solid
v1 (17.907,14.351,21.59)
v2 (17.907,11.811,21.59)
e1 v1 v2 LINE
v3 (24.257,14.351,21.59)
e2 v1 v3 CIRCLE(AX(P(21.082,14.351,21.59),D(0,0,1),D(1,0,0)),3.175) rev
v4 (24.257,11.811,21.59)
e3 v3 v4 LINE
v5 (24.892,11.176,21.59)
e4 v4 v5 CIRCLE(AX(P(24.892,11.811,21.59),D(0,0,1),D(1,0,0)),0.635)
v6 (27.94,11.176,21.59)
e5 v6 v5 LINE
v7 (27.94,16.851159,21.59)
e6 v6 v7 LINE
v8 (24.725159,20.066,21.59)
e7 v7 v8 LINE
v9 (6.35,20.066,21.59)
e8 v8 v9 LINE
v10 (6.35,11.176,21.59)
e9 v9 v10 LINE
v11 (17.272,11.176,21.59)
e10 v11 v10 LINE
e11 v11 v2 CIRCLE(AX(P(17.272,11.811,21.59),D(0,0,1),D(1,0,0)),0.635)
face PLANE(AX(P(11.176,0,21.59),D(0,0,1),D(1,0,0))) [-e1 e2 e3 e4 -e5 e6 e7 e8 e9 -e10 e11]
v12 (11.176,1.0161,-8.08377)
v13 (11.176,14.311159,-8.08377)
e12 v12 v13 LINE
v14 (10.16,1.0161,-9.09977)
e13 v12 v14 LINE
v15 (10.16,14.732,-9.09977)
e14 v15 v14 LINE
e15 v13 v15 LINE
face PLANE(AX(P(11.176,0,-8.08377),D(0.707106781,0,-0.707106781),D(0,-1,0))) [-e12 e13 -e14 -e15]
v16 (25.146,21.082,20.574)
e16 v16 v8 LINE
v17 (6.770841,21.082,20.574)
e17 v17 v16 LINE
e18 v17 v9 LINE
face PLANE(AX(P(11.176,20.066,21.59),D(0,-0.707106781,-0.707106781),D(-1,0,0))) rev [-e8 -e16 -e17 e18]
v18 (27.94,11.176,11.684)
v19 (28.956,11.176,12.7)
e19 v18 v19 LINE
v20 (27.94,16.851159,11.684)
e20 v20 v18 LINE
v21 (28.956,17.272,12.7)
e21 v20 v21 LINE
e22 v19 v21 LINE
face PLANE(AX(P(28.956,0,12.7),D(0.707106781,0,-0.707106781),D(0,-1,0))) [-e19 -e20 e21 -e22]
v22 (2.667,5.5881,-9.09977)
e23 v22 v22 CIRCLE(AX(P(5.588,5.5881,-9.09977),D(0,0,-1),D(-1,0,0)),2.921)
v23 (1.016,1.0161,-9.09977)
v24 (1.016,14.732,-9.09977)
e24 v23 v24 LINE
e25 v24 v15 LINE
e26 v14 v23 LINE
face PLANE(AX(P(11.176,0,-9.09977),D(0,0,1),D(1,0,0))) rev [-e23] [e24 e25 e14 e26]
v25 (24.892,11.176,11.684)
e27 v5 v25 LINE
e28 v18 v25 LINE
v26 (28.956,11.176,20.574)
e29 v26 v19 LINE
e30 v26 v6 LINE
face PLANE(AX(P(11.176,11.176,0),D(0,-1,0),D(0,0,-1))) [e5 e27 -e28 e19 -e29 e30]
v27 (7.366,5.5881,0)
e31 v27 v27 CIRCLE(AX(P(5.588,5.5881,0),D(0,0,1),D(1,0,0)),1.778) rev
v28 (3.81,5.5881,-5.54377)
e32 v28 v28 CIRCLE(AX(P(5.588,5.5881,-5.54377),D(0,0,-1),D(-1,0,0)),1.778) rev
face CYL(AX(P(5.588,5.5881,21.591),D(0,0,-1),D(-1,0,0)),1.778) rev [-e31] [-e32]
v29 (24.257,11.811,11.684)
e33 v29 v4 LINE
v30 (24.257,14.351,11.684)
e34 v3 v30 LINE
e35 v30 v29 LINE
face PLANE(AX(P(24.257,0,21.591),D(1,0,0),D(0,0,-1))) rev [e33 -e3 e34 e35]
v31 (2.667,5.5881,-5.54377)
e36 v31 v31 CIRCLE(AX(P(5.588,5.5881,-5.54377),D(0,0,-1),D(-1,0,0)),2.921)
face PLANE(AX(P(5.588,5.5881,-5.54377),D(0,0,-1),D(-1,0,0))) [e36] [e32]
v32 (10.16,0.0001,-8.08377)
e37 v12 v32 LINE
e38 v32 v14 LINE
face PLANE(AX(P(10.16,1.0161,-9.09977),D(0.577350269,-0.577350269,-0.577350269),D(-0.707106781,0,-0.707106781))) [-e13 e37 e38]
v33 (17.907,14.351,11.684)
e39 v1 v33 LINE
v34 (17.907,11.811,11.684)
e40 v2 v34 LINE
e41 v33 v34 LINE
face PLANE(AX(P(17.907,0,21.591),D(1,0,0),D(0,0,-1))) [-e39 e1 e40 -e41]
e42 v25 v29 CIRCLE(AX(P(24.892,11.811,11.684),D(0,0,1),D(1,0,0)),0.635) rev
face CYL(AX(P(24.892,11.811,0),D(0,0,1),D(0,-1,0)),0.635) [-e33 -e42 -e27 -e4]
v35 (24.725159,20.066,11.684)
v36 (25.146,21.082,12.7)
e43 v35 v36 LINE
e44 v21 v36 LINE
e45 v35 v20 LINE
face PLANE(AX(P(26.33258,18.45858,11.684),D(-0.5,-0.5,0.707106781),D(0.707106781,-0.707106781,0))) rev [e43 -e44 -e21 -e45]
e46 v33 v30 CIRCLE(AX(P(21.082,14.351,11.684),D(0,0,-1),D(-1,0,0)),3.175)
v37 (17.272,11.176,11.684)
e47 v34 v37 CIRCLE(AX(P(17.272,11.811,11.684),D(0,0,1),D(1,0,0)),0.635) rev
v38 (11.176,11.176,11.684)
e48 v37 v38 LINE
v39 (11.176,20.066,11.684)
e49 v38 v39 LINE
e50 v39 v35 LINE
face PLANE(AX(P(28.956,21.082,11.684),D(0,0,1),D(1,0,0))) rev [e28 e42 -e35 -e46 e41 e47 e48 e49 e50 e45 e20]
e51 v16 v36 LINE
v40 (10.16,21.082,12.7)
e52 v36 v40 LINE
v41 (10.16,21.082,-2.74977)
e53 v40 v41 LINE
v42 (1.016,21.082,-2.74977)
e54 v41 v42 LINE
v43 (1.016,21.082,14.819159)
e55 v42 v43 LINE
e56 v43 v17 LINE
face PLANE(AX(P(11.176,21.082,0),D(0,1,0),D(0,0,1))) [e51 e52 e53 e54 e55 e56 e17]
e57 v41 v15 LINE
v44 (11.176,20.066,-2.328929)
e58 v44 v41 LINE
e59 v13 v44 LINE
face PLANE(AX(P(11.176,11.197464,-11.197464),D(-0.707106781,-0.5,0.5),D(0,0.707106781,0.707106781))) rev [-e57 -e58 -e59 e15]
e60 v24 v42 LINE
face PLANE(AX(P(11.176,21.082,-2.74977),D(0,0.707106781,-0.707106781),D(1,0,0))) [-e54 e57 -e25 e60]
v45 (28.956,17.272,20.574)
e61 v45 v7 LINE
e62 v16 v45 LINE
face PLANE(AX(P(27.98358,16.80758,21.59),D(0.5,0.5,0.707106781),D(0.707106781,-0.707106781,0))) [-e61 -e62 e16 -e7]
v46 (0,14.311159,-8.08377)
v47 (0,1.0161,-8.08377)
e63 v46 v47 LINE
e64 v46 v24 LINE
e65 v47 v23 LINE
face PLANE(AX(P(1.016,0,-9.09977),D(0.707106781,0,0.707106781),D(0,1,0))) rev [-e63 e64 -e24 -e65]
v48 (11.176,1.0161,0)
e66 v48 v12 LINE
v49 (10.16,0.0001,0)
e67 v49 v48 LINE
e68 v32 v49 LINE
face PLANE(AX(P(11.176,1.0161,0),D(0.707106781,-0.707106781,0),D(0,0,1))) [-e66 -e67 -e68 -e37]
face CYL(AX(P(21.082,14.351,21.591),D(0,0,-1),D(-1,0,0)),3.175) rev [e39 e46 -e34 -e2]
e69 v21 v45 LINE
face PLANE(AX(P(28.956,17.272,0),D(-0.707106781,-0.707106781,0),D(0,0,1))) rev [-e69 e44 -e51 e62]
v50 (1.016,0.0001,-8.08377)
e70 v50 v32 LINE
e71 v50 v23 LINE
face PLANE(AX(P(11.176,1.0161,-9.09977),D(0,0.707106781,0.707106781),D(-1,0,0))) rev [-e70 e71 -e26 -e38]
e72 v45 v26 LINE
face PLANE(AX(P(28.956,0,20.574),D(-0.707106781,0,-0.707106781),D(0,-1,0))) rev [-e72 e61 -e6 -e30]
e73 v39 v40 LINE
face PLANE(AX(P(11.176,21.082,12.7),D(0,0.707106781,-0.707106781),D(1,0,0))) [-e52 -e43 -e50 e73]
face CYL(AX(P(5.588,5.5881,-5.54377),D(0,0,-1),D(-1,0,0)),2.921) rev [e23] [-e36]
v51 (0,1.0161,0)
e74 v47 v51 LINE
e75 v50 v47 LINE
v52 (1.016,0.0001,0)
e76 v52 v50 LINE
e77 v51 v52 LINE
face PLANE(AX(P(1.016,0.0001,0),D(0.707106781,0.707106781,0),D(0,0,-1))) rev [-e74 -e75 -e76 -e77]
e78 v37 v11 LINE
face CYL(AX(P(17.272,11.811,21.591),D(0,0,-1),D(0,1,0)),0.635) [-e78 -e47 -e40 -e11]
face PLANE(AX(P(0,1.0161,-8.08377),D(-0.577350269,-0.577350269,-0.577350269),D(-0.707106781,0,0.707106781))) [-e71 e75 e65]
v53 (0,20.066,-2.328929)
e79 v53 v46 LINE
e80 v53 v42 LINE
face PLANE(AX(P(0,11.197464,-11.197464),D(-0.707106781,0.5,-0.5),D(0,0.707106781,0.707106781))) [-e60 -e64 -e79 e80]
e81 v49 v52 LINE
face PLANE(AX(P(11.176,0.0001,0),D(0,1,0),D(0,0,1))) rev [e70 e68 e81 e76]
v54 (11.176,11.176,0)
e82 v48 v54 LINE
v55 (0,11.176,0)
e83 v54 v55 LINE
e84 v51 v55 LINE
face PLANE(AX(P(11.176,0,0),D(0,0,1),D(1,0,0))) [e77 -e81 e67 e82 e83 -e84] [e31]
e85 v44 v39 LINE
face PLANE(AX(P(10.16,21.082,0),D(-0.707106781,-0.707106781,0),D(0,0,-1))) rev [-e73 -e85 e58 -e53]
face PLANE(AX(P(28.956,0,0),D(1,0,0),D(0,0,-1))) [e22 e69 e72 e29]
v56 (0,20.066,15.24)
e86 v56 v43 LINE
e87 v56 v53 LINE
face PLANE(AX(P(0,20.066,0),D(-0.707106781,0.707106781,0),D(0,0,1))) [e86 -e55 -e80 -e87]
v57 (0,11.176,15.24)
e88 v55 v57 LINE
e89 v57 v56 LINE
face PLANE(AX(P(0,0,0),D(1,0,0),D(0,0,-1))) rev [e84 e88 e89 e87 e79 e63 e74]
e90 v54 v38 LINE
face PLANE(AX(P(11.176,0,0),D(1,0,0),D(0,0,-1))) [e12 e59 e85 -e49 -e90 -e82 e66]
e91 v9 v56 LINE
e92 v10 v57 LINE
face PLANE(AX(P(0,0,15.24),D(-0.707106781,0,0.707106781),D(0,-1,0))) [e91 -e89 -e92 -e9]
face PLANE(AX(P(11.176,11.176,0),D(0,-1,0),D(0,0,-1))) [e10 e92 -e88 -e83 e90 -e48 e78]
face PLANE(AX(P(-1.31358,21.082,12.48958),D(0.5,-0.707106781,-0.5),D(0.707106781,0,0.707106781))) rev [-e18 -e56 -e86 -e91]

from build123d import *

# Parameters (mm, degrees)
BOSS_EXTRUDE1_DEPTH = 11.176
SKETCH2_W           = 9.906
SKETCH2_H           = 9.906
BOSS_EXTRUDE2_DEPTH = 17.78
CUT_EXTRUDE1_REACH  = 43.411
SKETCH3_R           = 3.175
CUT_EXTRUDE2_REACH  = 49.167
SKETCH4_R           = 1.778
SKETCH5_R           = 2.921
CUT_EXTRUDE3_DEPTH  = 3.556
FILLET8_R           = 0.635
CHAMFER1_SIZE       = 6.35
CHAMFER2_SIZE       = 6.35
CHAMFER3_SIZE       = 3.81
CHAMFER4_SIZE       = 1.016
CHAMFER5_SIZE       = 1.016


# Read off the part's stored shape, not the designer's step: Boss-Extrude1
with BuildPart() as part:
    # Boss-Extrude1 outline → Boss-Extrude1 (new body)
    with BuildSketch(Plane(origin=(0, 0, 0), x_dir=(0, 0, -1), z_dir=(1, 0, 0))):
        Polygon((9.099769579, 0.0001), (9.099769579, 21.082), (-21.59, 21.082), (-21.59, 11.176), (0, 11.176), (0, 0.0001), align=None)
    extrude(amount=BOSS_EXTRUDE1_DEPTH)

    # Sketch2 → Boss-Extrude2 (add)
    with BuildSketch(Plane(origin=(11.176, 0, 0), x_dir=(0, 0, -1), z_dir=(1, 0, 0))):
        with Locations((-16.637, 16.129)):
            Rectangle(SKETCH2_W, SKETCH2_H)
    extrude(amount=BOSS_EXTRUDE2_DEPTH)

    # Sketch3 → Cut-Extrude1 (cut, up to next)
    with BuildSketch(Plane(origin=(0, 0, 11.684), x_dir=(-1, 0, 0), z_dir=(0, 0, -1)), mode=Mode.PRIVATE) as cut_extrude1_sk1:
        with Locations((-21.082, 14.351)):
            Circle(SKETCH3_R)
    cut_extrude1_tool1 = extrude(cut_extrude1_sk1.sketch, amount=-CUT_EXTRUDE1_REACH, mode=Mode.PRIVATE) & part.part
    # Sketch3 → Cut-Extrude1 (cut, up to next)
    with BuildSketch(Plane(origin=(0, 0, 11.684), x_dir=(-1, 0, 0), z_dir=(0, 0, -1)), mode=Mode.PRIVATE) as cut_extrude1_sk2:
        with BuildLine():
            ThreePointArc((-21.082, 11.176), (-23.32706403, 12.10593597), (-24.257, 14.351))
            Line((-24.257, 14.351), (-24.257, 11.176))
            Line((-24.257, 11.176), (-21.082, 11.176))
        make_face()
    cut_extrude1_tool2 = extrude(cut_extrude1_sk2.sketch, amount=-CUT_EXTRUDE1_REACH, mode=Mode.PRIVATE) & part.part
    # Sketch3 → Cut-Extrude1 (cut, up to next)
    with BuildSketch(Plane(origin=(0, 0, 11.684), x_dir=(-1, 0, 0), z_dir=(0, 0, -1)), mode=Mode.PRIVATE) as cut_extrude1_sk3:
        with BuildLine():
            Line((-17.907, 11.176), (-17.907, 14.351))
            ThreePointArc((-17.907, 14.351), (-18.83693597, 12.10593597), (-21.082, 11.176))
            Line((-21.082, 11.176), (-17.907, 11.176))
        make_face()
    cut_extrude1_tool3 = extrude(cut_extrude1_sk3.sketch, amount=-CUT_EXTRUDE1_REACH, mode=Mode.PRIVATE) & part.part
    add(cut_extrude1_tool1.solids().sort_by_distance((21.082, 14.351, 11.684))[0], mode=Mode.SUBTRACT)
    add(cut_extrude1_tool2.solids().sort_by_distance((23.547807, 11.885193, 11.684))[0], mode=Mode.SUBTRACT)
    add(cut_extrude1_tool3.solids().sort_by_distance((18.616193, 11.885193, 11.684))[0], mode=Mode.SUBTRACT)

    # Sketch4 → Cut-Extrude2 (cut, up to next)
    with BuildSketch(Plane(origin=(0, 0, -9.099769579), x_dir=(-1, 0, 0), z_dir=(0, 0, -1)), mode=Mode.PRIVATE) as cut_extrude2_sk1:
        with Locations((-5.588, 5.5881)):
            Circle(SKETCH4_R)
    cut_extrude2_tool1 = extrude(cut_extrude2_sk1.sketch, amount=-CUT_EXTRUDE2_REACH, mode=Mode.PRIVATE) & part.part
    add(cut_extrude2_tool1.solids().sort_by_distance((5.588, 5.5881, -9.09977))[0], mode=Mode.SUBTRACT)

    # Sketch5 → Cut-Extrude3 (cut)
    with BuildSketch(Plane(origin=(0, 0, -9.099769579), x_dir=(-1, 0, 0), z_dir=(0, 0, -1))):
        with Locations((-5.588, 5.5881)):
            Circle(SKETCH5_R)
    extrude(amount=-CUT_EXTRUDE3_DEPTH, mode=Mode.SUBTRACT)

    # Fillet8
    fillet8_edges = [part.edges().sort_by_distance(p)[0] for p in [
        (24.257, 11.176, 16.637),
        (17.907, 11.176, 16.637),
    ]]
    fillet(fillet8_edges, radius=FILLET8_R)

    # Chamfer1
    chamfer1_edges = [part.edges().sort_by_distance(p)[0] for p in [
        (5.588, 21.082, -9.099769579),
    ]]
    chamfer(chamfer1_edges, length=CHAMFER1_SIZE)

    # Chamfer2
    chamfer2_edges = [part.edges().sort_by_distance(p)[0] for p in [
        (0, 16.129, 21.59),
    ]]
    chamfer(chamfer2_edges, length=CHAMFER2_SIZE)

    # Chamfer3
    chamfer3_edges = [part.edges().sort_by_distance(p)[0] for p in [
        (28.956, 21.082, 16.637),
    ]]
    chamfer(chamfer3_edges, length=CHAMFER3_SIZE)

    # Chamfer4
    chamfer4_edges = [part.edges().sort_by_distance(p)[0] for p in [
        (28.956, 14.224, 21.59),
        (27.051, 19.177, 21.59),
        (15.748, 21.082, 21.59),
        (28.956, 14.224, 11.684),
        (27.051, 19.177, 11.684),
        (18.161, 21.082, 11.684),
        (11.176, 21.082, 4.46711521),
        (11.176, 17.907, -5.924769579),
        (0, 21.082, 6.24511521),
        (0, 17.907, -5.924769579),
        (0, 7.36605, -9.099769579),
        (11.176, 7.36605, -9.099769579),
        (0, 0.0001, -4.54988479),
        (5.588, 0.0001, -9.099769579),
        (11.176, 0.0001, -4.54988479),
    ]]
    chamfer(chamfer4_edges, length=CHAMFER4_SIZE)

    # Chamfer5
    chamfer5_edges = [part.edges().sort_by_distance(p)[0] for p in [
        (3.175, 21.082, 18.415),
    ]]
    chamfer(chamfer5_edges, length=CHAMFER5_SIZE)


solid = part.part
